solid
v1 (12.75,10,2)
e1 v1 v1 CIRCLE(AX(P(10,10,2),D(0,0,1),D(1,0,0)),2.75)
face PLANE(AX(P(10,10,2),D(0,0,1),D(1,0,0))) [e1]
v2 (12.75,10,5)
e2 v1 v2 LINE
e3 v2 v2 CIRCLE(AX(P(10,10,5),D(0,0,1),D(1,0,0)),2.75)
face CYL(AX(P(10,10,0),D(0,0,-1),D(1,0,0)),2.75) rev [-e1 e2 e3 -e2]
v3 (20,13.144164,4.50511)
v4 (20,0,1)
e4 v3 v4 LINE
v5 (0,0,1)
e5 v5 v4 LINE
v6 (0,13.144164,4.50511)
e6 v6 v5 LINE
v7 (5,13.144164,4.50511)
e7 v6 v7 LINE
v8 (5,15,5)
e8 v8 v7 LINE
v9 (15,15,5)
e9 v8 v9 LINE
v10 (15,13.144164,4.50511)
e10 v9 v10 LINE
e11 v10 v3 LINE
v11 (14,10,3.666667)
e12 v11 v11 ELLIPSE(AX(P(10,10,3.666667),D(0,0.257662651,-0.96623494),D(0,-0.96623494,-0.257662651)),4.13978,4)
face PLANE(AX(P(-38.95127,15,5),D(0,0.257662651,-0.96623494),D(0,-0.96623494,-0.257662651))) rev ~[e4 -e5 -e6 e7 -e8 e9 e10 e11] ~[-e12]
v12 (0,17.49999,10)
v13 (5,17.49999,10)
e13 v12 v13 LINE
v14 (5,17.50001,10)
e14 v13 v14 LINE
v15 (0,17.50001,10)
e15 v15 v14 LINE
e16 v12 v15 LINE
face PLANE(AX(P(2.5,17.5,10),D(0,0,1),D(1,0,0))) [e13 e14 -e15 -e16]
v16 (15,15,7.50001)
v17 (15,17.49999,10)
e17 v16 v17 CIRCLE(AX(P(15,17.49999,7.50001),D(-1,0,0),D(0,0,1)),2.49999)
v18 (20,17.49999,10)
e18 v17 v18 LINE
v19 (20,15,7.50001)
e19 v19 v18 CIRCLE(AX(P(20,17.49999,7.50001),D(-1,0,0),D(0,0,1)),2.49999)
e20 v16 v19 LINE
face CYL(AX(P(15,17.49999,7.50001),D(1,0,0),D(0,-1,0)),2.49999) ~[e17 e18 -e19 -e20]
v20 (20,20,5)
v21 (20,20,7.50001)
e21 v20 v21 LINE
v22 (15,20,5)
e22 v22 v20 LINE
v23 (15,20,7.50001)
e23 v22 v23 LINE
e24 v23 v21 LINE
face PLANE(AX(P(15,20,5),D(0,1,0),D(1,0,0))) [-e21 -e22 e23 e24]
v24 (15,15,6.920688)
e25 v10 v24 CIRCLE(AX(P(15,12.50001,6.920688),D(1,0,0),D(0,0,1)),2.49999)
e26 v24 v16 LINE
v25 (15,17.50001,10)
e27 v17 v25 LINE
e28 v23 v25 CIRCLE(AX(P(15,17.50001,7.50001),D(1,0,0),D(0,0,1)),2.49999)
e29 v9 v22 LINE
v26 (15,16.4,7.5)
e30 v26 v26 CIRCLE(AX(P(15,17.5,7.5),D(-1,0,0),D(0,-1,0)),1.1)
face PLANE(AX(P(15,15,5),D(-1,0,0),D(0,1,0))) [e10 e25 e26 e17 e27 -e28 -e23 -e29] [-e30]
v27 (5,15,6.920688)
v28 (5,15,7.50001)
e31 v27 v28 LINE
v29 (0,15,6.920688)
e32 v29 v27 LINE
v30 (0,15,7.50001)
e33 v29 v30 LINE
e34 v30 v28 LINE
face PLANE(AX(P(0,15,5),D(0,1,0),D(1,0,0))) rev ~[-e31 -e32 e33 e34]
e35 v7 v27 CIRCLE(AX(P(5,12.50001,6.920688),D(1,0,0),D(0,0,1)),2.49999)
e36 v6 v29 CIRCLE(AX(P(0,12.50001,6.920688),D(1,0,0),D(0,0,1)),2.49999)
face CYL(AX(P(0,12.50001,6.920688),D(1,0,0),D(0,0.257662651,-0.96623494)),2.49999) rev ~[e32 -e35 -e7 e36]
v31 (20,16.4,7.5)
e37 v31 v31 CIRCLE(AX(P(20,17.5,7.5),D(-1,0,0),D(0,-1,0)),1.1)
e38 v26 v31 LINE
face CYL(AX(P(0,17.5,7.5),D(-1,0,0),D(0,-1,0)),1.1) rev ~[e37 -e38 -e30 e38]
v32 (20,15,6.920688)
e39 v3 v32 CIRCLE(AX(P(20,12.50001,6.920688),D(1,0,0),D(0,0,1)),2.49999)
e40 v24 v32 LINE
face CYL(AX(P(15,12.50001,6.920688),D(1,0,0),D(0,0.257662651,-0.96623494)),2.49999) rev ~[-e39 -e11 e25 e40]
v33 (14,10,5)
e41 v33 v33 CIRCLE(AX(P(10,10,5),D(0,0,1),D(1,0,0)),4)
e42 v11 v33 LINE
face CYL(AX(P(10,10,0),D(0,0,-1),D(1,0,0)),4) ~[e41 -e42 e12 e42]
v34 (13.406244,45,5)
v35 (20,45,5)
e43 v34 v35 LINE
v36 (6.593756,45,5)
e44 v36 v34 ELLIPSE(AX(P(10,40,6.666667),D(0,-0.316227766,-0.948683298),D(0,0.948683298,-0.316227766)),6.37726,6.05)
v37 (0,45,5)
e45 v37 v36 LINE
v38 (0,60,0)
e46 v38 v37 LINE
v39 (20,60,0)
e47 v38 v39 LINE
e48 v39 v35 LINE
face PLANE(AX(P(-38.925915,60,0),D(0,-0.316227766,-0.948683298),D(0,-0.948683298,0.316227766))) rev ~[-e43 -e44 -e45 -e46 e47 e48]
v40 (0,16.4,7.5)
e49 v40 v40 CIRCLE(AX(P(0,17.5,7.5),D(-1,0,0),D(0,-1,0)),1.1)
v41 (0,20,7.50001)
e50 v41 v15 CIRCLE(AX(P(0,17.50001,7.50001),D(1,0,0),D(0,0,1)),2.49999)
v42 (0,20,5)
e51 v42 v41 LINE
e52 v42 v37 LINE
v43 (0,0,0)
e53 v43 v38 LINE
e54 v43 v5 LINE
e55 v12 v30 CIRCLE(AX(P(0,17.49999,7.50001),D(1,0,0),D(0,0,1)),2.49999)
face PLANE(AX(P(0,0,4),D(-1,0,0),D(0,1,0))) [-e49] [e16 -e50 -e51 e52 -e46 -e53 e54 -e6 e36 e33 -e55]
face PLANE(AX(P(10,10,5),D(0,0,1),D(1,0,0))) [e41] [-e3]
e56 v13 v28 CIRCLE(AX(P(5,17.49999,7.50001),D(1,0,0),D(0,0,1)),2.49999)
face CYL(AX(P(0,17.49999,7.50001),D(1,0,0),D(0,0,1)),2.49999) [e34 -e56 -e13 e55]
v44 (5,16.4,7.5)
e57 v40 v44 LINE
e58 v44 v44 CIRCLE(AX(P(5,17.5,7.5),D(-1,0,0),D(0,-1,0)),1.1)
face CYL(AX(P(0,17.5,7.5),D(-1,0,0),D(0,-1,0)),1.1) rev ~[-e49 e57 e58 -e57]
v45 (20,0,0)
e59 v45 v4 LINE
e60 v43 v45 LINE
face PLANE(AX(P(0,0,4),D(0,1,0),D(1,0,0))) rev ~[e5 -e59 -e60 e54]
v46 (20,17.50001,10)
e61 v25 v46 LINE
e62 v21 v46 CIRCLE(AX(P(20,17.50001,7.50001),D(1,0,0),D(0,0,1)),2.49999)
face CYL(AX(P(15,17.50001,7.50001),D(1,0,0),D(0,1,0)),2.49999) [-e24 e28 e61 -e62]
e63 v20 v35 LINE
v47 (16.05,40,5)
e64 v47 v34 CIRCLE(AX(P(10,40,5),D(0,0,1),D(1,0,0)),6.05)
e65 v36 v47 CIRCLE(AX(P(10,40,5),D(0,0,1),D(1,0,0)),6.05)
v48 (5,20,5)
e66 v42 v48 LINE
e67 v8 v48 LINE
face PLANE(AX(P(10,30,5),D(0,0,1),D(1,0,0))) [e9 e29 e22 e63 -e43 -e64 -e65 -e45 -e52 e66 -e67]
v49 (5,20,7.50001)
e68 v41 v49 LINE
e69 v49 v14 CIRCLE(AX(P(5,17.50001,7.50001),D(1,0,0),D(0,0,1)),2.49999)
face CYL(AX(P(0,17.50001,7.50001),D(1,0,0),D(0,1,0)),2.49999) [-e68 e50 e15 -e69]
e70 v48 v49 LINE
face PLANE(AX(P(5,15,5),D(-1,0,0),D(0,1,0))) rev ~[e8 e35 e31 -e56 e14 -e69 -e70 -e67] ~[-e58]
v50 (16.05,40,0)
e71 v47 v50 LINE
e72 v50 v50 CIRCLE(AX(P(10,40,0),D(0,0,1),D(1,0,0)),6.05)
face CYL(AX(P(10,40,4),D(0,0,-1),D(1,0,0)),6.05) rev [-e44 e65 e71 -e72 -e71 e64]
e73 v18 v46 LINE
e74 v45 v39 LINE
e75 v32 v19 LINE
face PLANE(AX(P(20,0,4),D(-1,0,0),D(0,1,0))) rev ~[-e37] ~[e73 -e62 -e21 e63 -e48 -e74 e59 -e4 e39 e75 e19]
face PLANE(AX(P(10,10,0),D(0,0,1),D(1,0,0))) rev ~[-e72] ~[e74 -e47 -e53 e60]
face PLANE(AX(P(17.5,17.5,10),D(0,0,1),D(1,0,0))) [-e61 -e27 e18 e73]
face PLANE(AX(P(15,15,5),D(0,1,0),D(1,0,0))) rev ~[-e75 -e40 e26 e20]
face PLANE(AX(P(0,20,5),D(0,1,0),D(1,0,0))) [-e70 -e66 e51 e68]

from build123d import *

# Parameters (mm, degrees)
F0_W         = 20
F0_H         = 60
F0_R         = 4
F0_R_2       = 6.05
F1_DEPTH     = 4
F1_FACE_W    = 20
F1_FACE_H    = 60
F1_FACE_R    = 4
F1_FACE_R_2  = 6.05
F0_R_3       = 2.75
F2_DEPTH     = 1
F3_W         = 5
F3_H         = 5
F4_DEPTH     = 5
F5_T1_DEPTH  = 97.9025398997
F6_R         = 2.49999
F7_R         = 1.1
F8_DEPTH     = 25
F9_DEPTH     = 5
F10_T1_DEPTH = 97.8518303197
F11_DEPTH    = 2


# Not quite as in the source:
# - a fillet or chamfer that OpenCascade refuses, or shapes differently, is made with other operations: its cross-section is extruded or revolved along the edge and cut away or added
# - a fillet or chamfer is up to 0.001 mm smaller than in the source, because OpenCascade refuses the exact size


with BuildPart() as f1:
    # F0 (on Top) → F1 (new body)
    with BuildSketch(Plane.XY):
        with Locations((10, 30)):
            Rectangle(F0_W, F0_H)
        with Locations((10, 10)):
            Circle(F0_R, mode=Mode.SUBTRACT)
        with Locations((10, 40)):
            Circle(F0_R_2, mode=Mode.SUBTRACT)
    extrude(amount=F1_DEPTH)

    # F1_face (on face) + F0 (on Top) → F2 (join)
    with BuildSketch(Plane(origin=(10, 29.8602632633, 4), x_dir=(1, 0, 0), z_dir=(0, 0, 1))):
        with Locations((0, 0.1397367367)):
            Rectangle(F1_FACE_W, F1_FACE_H)
        with Locations((0, -19.8602632633)):
            Circle(F1_FACE_R, mode=Mode.SUBTRACT)
        with Locations((0, 10.1397367367)):
            Circle(F1_FACE_R_2, mode=Mode.SUBTRACT)
    with BuildSketch(Plane.XY):
        with Locations((10, 10)):
            Circle(F0_R)
        with Locations((10, 10)):
            Circle(F0_R_3, mode=Mode.SUBTRACT)
    extrude(amount=F2_DEPTH)

    # F3 (on face) → F4 (join)
    with BuildSketch(Plane.XY.offset(5)):
        with Locations((2.5, 17.5)):
            Rectangle(F3_W, F3_H)
        with Locations((17.5, 17.5)):
            Rectangle(F3_W, F3_H)
    extrude(amount=F4_DEPTH)

    # F5: chamfer of 15 x 4 on 1 edges, made by hand

    # F5_s2 → F5_t1 (cut)
    with BuildSketch(Plane.YZ.offset(-38.9512699498)):
        Polygon((15, 5), (0, 1), (0, 5), align=None)
    extrude(amount=F5_T1_DEPTH, mode=Mode.SUBTRACT)

    # F6 (radius 2.5 in the source; OpenCascade refuses exactly that, so slightly less here)
    f6_edges = [f1.edges().sort_by_distance(p)[0] for p in [
        (2.5, 15, 5),
        (2.5, 15, 10),
        (17.5, 15, 5),
        (17.5, 15, 10),
        (2.5, 20, 10),
        (17.5, 20, 10),
    ]]
    fillet(f6_edges, radius=F6_R)

    # F7 (on face) → F8 (cut)
    with BuildSketch(Plane(origin=(0, 0, 0), x_dir=(0, -1, 0), z_dir=(-1, 0, 0))):
        with Locations((-17.5, 7.5)):
            Circle(F7_R)
    extrude(amount=-F8_DEPTH, mode=Mode.SUBTRACT)

    # F10: chamfer of 5 x 15 on 1 edges, made by hand

    # F10_s2 → F10_t1 (cut)
    with BuildSketch(Plane.YZ.offset(-38.9259151598)):
        Polygon((60, 0), (45, 5), (60, 5), align=None)
    extrude(amount=F10_T1_DEPTH, mode=Mode.SUBTRACT)



with BuildPart() as f9:
    # F0 (on Top) → F9 (new body)
    with BuildSketch(Plane.XY):
        with Locations((10, 10)):
            Circle(F0_R)
        with Locations((10, 10)):
            Circle(F0_R_3, mode=Mode.SUBTRACT)
    extrude(amount=F9_DEPTH)


with BuildPart() as f1_1:
    add(f1.part)

    add(f9.part)  # F11 merges F9
    # F0 (on Top) → F11 (join)
    with BuildSketch(Plane.XY):
        with Locations((10, 10)):
            Circle(F0_R_3)
    extrude(amount=F11_DEPTH)


solid = f1_1.part
